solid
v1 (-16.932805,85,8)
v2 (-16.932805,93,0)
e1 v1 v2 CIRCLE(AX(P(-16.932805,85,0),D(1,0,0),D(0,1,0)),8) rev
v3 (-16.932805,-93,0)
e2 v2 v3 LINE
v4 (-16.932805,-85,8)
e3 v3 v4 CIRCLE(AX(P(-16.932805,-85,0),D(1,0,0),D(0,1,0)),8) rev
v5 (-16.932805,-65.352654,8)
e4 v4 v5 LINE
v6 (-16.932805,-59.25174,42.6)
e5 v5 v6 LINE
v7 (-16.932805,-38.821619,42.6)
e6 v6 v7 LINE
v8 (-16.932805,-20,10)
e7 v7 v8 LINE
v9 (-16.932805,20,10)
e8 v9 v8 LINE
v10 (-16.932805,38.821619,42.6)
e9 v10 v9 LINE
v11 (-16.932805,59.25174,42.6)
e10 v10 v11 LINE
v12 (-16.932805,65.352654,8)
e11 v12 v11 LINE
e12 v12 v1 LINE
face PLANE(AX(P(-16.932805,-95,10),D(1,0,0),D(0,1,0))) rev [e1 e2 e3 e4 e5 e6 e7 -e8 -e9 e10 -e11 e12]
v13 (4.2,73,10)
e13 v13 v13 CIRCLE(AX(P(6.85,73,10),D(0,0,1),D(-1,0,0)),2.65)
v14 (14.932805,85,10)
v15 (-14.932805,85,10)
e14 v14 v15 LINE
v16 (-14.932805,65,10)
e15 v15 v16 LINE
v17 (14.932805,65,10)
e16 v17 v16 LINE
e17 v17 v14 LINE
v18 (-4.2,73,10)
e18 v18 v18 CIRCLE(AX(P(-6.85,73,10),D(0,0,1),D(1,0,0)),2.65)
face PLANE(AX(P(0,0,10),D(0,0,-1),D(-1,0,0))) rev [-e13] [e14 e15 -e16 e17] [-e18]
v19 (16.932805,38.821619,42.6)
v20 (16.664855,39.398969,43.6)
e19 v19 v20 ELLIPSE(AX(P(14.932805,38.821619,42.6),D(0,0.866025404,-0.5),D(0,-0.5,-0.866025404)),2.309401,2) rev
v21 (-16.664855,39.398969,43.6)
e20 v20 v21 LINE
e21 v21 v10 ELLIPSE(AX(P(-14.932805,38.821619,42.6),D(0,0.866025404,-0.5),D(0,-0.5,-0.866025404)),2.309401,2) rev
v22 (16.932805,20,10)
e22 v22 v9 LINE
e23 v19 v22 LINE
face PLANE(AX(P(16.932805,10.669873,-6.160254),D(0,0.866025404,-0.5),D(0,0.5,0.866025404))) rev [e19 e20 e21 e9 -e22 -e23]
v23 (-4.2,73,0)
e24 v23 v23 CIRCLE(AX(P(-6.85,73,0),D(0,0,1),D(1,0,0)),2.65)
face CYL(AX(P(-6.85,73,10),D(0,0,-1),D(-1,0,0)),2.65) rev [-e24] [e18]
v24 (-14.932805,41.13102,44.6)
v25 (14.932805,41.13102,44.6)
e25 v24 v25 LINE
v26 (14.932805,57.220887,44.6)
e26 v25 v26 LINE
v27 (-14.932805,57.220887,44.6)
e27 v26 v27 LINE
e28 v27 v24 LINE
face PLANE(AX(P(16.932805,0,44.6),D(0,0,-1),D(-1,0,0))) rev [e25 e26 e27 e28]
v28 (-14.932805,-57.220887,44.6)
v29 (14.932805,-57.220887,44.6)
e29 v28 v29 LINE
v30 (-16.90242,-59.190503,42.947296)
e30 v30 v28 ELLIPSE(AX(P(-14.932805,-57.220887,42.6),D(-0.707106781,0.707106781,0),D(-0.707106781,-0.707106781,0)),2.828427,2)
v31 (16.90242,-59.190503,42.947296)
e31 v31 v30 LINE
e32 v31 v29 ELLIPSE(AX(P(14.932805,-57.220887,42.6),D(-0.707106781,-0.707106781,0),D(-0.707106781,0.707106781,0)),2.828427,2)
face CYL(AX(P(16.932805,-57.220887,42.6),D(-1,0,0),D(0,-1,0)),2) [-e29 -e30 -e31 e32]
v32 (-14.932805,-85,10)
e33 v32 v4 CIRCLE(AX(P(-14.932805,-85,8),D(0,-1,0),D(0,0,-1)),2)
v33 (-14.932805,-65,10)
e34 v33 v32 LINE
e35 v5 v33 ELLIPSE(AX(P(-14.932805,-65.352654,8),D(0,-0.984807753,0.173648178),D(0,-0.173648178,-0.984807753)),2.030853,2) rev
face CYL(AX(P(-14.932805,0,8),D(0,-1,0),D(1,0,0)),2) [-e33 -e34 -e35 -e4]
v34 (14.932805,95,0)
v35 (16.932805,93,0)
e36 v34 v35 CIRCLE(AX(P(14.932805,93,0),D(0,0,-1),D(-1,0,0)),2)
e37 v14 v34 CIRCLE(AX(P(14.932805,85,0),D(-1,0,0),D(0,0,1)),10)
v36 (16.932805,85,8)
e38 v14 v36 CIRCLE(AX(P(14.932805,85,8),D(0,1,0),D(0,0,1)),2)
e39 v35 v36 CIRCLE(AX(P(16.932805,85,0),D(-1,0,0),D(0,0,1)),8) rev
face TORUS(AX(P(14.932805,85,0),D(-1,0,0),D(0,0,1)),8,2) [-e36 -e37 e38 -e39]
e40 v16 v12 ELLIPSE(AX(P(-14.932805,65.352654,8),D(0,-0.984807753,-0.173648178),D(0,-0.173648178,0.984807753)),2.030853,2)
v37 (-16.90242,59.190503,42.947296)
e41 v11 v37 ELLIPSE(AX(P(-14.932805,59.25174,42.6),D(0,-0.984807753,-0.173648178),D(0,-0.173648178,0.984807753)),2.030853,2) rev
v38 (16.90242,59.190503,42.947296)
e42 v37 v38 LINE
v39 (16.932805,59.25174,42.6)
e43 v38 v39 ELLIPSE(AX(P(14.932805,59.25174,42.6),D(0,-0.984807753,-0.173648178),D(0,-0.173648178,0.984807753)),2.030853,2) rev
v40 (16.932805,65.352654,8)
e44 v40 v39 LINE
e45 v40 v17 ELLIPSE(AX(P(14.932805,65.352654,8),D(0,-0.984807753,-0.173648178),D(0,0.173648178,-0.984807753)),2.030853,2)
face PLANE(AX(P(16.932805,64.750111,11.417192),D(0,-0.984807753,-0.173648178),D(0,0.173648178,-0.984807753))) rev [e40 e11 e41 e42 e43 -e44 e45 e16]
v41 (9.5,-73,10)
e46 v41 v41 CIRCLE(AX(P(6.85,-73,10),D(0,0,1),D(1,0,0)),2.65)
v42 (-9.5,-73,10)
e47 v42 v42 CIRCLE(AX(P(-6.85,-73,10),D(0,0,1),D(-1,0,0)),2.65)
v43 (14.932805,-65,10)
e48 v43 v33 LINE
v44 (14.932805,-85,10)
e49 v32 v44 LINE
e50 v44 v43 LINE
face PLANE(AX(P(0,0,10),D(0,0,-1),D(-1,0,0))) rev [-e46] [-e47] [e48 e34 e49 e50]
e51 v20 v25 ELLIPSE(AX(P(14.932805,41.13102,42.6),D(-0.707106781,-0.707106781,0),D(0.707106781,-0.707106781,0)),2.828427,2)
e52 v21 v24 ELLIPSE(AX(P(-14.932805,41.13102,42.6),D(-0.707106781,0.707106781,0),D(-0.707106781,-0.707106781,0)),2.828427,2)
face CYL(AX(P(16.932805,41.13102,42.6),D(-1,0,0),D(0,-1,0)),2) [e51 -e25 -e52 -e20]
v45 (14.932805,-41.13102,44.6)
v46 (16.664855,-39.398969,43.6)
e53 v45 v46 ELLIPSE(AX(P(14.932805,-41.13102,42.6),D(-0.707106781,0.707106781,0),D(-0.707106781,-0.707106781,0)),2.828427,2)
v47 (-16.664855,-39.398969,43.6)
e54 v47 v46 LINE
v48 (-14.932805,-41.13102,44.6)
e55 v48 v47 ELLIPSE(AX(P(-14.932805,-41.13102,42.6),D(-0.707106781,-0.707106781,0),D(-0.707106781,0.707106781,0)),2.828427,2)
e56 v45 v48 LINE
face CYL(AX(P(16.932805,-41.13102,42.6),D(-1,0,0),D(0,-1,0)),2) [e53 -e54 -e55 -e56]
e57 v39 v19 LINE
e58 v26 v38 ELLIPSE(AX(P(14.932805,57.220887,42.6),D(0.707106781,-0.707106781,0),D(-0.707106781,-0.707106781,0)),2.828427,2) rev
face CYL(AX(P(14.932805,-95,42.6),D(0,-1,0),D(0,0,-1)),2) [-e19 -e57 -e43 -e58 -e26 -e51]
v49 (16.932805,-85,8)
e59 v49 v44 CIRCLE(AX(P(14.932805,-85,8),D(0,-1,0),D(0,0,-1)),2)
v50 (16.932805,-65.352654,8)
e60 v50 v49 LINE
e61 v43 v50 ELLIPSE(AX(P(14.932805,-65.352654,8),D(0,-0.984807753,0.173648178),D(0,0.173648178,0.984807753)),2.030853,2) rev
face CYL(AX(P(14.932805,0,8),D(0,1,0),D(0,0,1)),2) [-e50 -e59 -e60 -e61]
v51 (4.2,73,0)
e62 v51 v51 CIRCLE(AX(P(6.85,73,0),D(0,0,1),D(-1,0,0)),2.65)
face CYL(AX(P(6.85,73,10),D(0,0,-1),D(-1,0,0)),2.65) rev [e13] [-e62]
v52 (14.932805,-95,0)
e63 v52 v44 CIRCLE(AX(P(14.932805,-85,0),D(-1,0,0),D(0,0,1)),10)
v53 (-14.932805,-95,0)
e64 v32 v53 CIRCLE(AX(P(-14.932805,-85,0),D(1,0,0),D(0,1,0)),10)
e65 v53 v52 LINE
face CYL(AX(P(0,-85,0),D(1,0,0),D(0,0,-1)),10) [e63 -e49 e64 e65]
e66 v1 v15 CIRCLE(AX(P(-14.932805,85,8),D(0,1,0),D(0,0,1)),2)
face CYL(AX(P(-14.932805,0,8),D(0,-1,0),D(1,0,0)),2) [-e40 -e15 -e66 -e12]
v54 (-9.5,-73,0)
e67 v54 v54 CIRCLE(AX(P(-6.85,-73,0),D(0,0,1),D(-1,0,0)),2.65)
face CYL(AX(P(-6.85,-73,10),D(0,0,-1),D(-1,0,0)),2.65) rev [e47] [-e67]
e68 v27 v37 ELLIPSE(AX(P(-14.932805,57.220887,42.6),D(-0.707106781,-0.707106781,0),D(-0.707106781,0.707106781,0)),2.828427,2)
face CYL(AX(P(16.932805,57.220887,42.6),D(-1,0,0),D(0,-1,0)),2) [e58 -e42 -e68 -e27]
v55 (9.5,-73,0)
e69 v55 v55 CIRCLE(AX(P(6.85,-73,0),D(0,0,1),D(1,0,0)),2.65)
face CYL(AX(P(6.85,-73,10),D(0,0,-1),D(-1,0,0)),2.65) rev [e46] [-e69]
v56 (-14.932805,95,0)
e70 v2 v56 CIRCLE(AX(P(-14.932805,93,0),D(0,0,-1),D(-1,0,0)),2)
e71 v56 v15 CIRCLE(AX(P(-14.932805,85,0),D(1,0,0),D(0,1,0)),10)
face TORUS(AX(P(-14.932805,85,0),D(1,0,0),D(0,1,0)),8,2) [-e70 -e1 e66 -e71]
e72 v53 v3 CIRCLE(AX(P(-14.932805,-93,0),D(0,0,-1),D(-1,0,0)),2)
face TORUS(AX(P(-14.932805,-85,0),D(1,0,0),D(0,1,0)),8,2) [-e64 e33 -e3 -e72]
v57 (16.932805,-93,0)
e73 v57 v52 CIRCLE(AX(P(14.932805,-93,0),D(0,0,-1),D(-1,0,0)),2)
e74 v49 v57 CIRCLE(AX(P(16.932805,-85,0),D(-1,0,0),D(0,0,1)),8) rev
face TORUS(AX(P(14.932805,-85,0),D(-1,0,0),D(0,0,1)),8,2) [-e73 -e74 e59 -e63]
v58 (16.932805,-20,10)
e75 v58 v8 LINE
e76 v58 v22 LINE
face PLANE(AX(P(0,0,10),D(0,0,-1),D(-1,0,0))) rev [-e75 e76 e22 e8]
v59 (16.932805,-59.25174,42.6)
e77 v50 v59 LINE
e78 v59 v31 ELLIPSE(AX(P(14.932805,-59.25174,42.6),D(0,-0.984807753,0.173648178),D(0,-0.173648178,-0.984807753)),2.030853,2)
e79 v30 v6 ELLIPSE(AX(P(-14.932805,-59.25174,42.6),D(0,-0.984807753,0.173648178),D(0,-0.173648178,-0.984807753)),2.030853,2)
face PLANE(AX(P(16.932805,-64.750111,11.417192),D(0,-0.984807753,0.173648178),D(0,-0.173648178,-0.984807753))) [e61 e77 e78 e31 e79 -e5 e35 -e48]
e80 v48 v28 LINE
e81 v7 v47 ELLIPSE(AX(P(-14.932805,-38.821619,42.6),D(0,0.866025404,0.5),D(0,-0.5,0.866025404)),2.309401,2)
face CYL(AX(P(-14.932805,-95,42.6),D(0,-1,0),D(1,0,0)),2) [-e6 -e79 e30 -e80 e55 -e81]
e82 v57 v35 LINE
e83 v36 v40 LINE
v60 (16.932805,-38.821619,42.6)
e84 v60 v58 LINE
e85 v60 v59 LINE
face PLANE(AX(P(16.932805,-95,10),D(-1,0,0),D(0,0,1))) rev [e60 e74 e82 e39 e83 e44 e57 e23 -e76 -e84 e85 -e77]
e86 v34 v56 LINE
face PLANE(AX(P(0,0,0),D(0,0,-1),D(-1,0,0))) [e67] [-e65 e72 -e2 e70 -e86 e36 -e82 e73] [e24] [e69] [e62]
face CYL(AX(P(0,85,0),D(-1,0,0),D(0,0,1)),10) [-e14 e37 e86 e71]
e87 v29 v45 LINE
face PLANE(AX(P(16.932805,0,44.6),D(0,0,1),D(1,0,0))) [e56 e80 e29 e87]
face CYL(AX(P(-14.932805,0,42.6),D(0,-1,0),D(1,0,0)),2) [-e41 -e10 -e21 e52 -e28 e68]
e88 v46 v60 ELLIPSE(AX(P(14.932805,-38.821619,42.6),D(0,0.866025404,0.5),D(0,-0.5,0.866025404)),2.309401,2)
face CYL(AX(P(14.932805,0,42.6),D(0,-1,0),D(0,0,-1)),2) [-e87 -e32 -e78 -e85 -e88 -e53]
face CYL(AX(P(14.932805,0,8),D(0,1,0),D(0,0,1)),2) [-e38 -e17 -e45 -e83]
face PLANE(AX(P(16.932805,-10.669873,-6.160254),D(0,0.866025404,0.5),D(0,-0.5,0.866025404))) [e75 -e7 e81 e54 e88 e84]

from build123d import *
from build123d.topology import SkipClean

# Parameters (mm, degrees)
SKETCH_1_W      = 33.865609136
SKETCH_1_H      = 190
SKETCH_1_R      = 2.65
EXTRUDE_1_DEPTH = 10
FILLET_1_R      = 10
EXTRUDE_2_DEPTH = 33.865609
FILLET_2_R      = 2


# Some blends are built 0.0001 mm under size
with BuildPart() as part:
    # 草图1 → 凸台-拉伸1 (new body)
    with BuildSketch(Plane.XY):
        Rectangle(SKETCH_1_W, SKETCH_1_H)
        with Locations((-6.85, 73)):
            Circle(SKETCH_1_R, mode=Mode.SUBTRACT)
        with Locations(Location((6.85, 73, 0), (0, 0, 180))):
            Circle(SKETCH_1_R, mode=Mode.SUBTRACT)
        with Locations(Location((-6.85, -73, 0), (0, 0, 180))):
            Circle(SKETCH_1_R, mode=Mode.SUBTRACT)
        with Locations((6.85, -73)):
            Circle(SKETCH_1_R, mode=Mode.SUBTRACT)
    extrude(amount=EXTRUDE_1_DEPTH)

    # 圆角1
    fillet_1_edges = [part.edges().sort_by_distance(p)[0] for p in [
        (0, -95, 10),
        (0, 95, 10),
    ]]
    fillet(fillet_1_edges, radius=FILLET_1_R - 0.0001)  # a hair under: the kernel refuses the full size

    # 草图2 → 凸台-拉伸2 (add, through all)
    with SkipClean():  # the faces are left unmerged after this step: merging them gives an invalid solid
        with BuildSketch(Plane.ZY.offset(16.932804568)):
            Polygon((44.6, 58.899086467), (10, 65), (10, 20), (44.6, 39.976319314), align=None)
            Polygon((44.6, -39.976319314), (10, -20), (10, -65), (44.6, -58.899086467), align=None)
        extrude(amount=-EXTRUDE_2_DEPTH)

    # 圆角2
    # the kernel refuses this fillet: 2 mm, written as the material it takes off along each edge
    with BuildSketch(Plane(origin=(16.932804568, -85.0001, 10), x_dir=(0, 0, -1), z_dir=(0, 1, 0))) as fillet_2_piece_1_section:
        with BuildLine():
            CenterArc((FILLET_2_R, FILLET_2_R), FILLET_2_R, 180, 90)
            Line((0, FILLET_2_R), (0, 0))
            Line((0, 0), (FILLET_2_R, 0))
        make_face()
    fillet_2_piece_1 = extrude(amount=25.0001, mode=Mode.PRIVATE)
    fillet_2_piece_1 = split(fillet_2_piece_1, bisect_by=Plane(origin=(16.479042192, -65.37988803, 7.84554792), z_dir=(0, -0.9848077530122075, 0.17364817766693394)), keep=Keep.TOP, mode=Mode.PRIVATE)
    add(fillet_2_piece_1, mode=Mode.SUBTRACT)
    with BuildSketch(Plane(origin=(-16.932804568, 85.0001, 10), x_dir=(0, 0, -1), z_dir=(0, -1, 0))) as fillet_2_piece_2_section:
        with BuildLine():
            CenterArc((FILLET_2_R, FILLET_2_R), FILLET_2_R, 180, 90)
            Line((0, FILLET_2_R), (0, 0))
            Line((0, 0), (FILLET_2_R, 0))
        make_face()
    fillet_2_piece_2 = extrude(amount=25.0001, mode=Mode.PRIVATE)
    fillet_2_piece_2 = split(fillet_2_piece_2, bisect_by=Plane(origin=(-16.479042192, 65.37988803, 7.84554792), z_dir=(0, 0.9848077530122075, 0.17364817766693394)), keep=Keep.TOP, mode=Mode.PRIVATE)
    add(fillet_2_piece_2, mode=Mode.SUBTRACT)
    with BuildSketch(Plane(origin=(16.932804568, 85.0001, 0.0001), x_dir=(0, 1, 0), z_dir=(0, 0, -1))) as fillet_2_piece_3:
        with BuildLine():
            CenterArc((9.9999 - FILLET_2_R, -FILLET_2_R), FILLET_2_R, 0, 90)
            Line((9.9999, -FILLET_2_R), (9.9999, 0))
            Line((9.9999, 0), (9.9999 - FILLET_2_R, 0))
        make_face()
    revolve(axis=Axis((16.932804568, 85.0001, 0.0001), (1, 0, 0)), revolution_arc=90, mode=Mode.SUBTRACT)
    with BuildSketch(Plane(origin=(16.932804568, -85.0001, 0.0001), x_dir=(0, -1, 0), z_dir=(0, 0, -1))) as fillet_2_piece_4:
        with BuildLine():
            CenterArc((9.9999 - FILLET_2_R, FILLET_2_R), FILLET_2_R, 270, 90)
            Line((9.9999 - FILLET_2_R, 0), (9.9999, 0))
            Line((9.9999, 0), (9.9999, FILLET_2_R))
        make_face()
    revolve(axis=Axis((16.932804568, -85.0001, 0.0001), (-1, 0, 0)), revolution_arc=90, mode=Mode.SUBTRACT)
    with BuildSketch(Plane(origin=(-16.932804568, 85.0001, 0.0001), x_dir=(0, 1, 0), z_dir=(0, 0, -1))) as fillet_2_piece_5:
        with BuildLine():
            CenterArc((9.9999 - FILLET_2_R, FILLET_2_R), FILLET_2_R, 270, 90)
            Line((9.9999, FILLET_2_R), (9.9999, 0))
            Line((9.9999, 0), (9.9999 - FILLET_2_R, 0))
        make_face()
    revolve(axis=Axis((-16.932804568, 85.0001, 0.0001), (1, 0, 0)), revolution_arc=90, mode=Mode.SUBTRACT)
    with BuildSketch(Plane(origin=(-16.932804568, -85.0001, 0.0001), x_dir=(0, -1, 0), z_dir=(0, 0, -1))) as fillet_2_piece_6:
        with BuildLine():
            CenterArc((9.9999 - FILLET_2_R, -FILLET_2_R), FILLET_2_R, 0, 90)
            Line((9.9999, -FILLET_2_R), (9.9999, 0))
            Line((9.9999, 0), (9.9999 - FILLET_2_R, 0))
        make_face()
    revolve(axis=Axis((-16.932804568, -85.0001, 0.0001), (-1, 0, 0)), revolution_arc=90, mode=Mode.SUBTRACT)
    with BuildSketch(Plane(origin=(16.932804568, 60, 10), x_dir=(0, 0, -1), z_dir=(0, 1, 0))) as fillet_2_piece_7_section:
        with BuildLine():
            CenterArc((FILLET_2_R, FILLET_2_R), FILLET_2_R, 180, 90)
            Line((0, FILLET_2_R), (0, 0))
            Line((0, 0), (FILLET_2_R, 0))
        make_face()
    fillet_2_piece_7 = extrude(amount=25.0001, mode=Mode.PRIVATE)
    fillet_2_piece_7 = split(fillet_2_piece_7, bisect_by=Plane(origin=(16.479042192, 65.37988803, 7.84554792), z_dir=(0, 0.9848077530122075, 0.17364817766693394)), keep=Keep.TOP, mode=Mode.PRIVATE)
    add(fillet_2_piece_7, mode=Mode.SUBTRACT)
    with BuildSketch(Plane(origin=(-19.819555914, 39.976319314, 44.6), x_dir=(0, -0.5000000000000052, -0.8660254037844355), z_dir=(1, 0, 0))) as fillet_2_piece_8:
        with BuildLine():
            CenterArc((FILLET_2_R * 0.57735026919, FILLET_2_R), FILLET_2_R, 210, 60)
            Line((-FILLET_2_R * 0.288675134595, FILLET_2_R * 0.5), (0, 0))
            Line((0, 0), (FILLET_2_R * 0.57735026919, 0))
        make_face()
    extrude(amount=39.639111692, mode=Mode.SUBTRACT)
    with BuildSketch(Plane(origin=(-16.932804568, 34.976319314, 44.6), x_dir=(0, 0, -1), z_dir=(0, 1, 0)), Plane(origin=(-16.932804568, -63.899086467, 44.6), x_dir=(0, 0, -1), z_dir=(0, 1, 0))) as fillet_2_piece_9:
        with BuildLine():
            CenterArc((FILLET_2_R, -FILLET_2_R), FILLET_2_R, 90, 90)
            Line((0, -FILLET_2_R), (0, 0))
            Line((0, 0), (FILLET_2_R, 0))
        make_face()
    extrude(amount=28.922767154, mode=Mode.SUBTRACT)
    with BuildSketch(Plane(origin=(-21.128302724, 58.899086467, 44.6), x_dir=(0, 0.17364817766693522, -0.9848077530122071), z_dir=(1, 0, 0))) as fillet_2_piece_10:
        with BuildLine():
            CenterArc((FILLET_2_R * 0.839099631177, -FILLET_2_R), FILLET_2_R, 90, 80)
            Line((-FILLET_2_R * 0.145708121835, -FILLET_2_R * 0.826351822333), (0, 0))
            Line((0, 0), (FILLET_2_R * 0.839099631177, 0))
        make_face()
    extrude(amount=42.256605312, mode=Mode.SUBTRACT)
    with BuildSketch(Plane(origin=(16.932804432, 34.976319314, 44.6), x_dir=(0, 0, -1), z_dir=(0, 1, 0)), Plane(origin=(16.932804432, -63.899086467, 44.6), x_dir=(0, 0, -1), z_dir=(0, 1, 0))) as fillet_2_piece_11:
        with BuildLine():
            CenterArc((FILLET_2_R, FILLET_2_R), FILLET_2_R, 180, 90)
            Line((0, FILLET_2_R), (0, 0))
            Line((0, 0), (FILLET_2_R, 0))
        make_face()
    extrude(amount=28.922767154, mode=Mode.SUBTRACT)
    with BuildSketch(Plane(origin=(-16.932804568, -60, 10), x_dir=(0, 0, -1), z_dir=(0, -1, 0))) as fillet_2_piece_12_section:
        with BuildLine():
            CenterArc((FILLET_2_R, FILLET_2_R), FILLET_2_R, 180, 90)
            Line((0, FILLET_2_R), (0, 0))
            Line((0, 0), (FILLET_2_R, 0))
        make_face()
    fillet_2_piece_12 = extrude(amount=25.0001, mode=Mode.PRIVATE)
    fillet_2_piece_12 = split(fillet_2_piece_12, bisect_by=Plane(origin=(-16.479042192, -65.37988803, 7.84554792), z_dir=(0, -0.9848077530122075, 0.17364817766693394)), keep=Keep.TOP, mode=Mode.PRIVATE)
    add(fillet_2_piece_12, mode=Mode.SUBTRACT)
    with BuildSketch(Plane(origin=(-19.819555914, -39.976319314, 44.6), x_dir=(0, 0.5000000000000052, -0.8660254037844355), z_dir=(1, 0, 0))) as fillet_2_piece_13:
        with BuildLine():
            CenterArc((FILLET_2_R * 0.57735026919, -FILLET_2_R), FILLET_2_R, 90, 60)
            Line((-FILLET_2_R * 0.288675134595, -FILLET_2_R * 0.5), (0, 0))
            Line((0, 0), (FILLET_2_R * 0.57735026919, 0))
        make_face()
    extrude(amount=39.639111692, mode=Mode.SUBTRACT)
    with BuildSketch(Plane(origin=(-21.128302724, -58.899086467, 44.6), x_dir=(0, -0.17364817766693183, -0.9848077530122078), z_dir=(1, 0, 0))) as fillet_2_piece_14:
        with BuildLine():
            CenterArc((FILLET_2_R * 0.839099631177, FILLET_2_R), FILLET_2_R, 190, 80)
            Line((-FILLET_2_R * 0.145708121835, FILLET_2_R * 0.826351822333), (0, 0))
            Line((0, 0), (FILLET_2_R * 0.839099631177, 0))
        make_face()
    extrude(amount=42.256605312, mode=Mode.SUBTRACT)
    with BuildSketch(Plane(origin=(-16.932804568, -95, -5), x_dir=(1, 0, 0), z_dir=(0, 0, 1)), Plane(origin=(-16.932804568, 95, -5), x_dir=(0, -1, 0), z_dir=(0, 0, 1))) as fillet_2_piece_15:
        with BuildLine():
            CenterArc((FILLET_2_R, FILLET_2_R), FILLET_2_R, 180, 90)
            Line((0, FILLET_2_R), (0, 0))
            Line((0, 0), (FILLET_2_R, 0))
        make_face()
    extrude(amount=5.0001, mode=Mode.SUBTRACT)
    with BuildSketch(Plane(origin=(16.932804568, -95, -5), x_dir=(-1, 0, 0), z_dir=(0, 0, 1)), Plane(origin=(16.932804568, 95, -5), x_dir=(0, -1, 0), z_dir=(0, 0, 1))) as fillet_2_piece_16:
        with BuildLine():
            CenterArc((FILLET_2_R, -FILLET_2_R), FILLET_2_R, 90, 90)
            Line((0, -FILLET_2_R), (0, 0))
            Line((0, 0), (FILLET_2_R, 0))
        make_face()
    extrude(amount=5.0001, mode=Mode.SUBTRACT)


solid = part.part
